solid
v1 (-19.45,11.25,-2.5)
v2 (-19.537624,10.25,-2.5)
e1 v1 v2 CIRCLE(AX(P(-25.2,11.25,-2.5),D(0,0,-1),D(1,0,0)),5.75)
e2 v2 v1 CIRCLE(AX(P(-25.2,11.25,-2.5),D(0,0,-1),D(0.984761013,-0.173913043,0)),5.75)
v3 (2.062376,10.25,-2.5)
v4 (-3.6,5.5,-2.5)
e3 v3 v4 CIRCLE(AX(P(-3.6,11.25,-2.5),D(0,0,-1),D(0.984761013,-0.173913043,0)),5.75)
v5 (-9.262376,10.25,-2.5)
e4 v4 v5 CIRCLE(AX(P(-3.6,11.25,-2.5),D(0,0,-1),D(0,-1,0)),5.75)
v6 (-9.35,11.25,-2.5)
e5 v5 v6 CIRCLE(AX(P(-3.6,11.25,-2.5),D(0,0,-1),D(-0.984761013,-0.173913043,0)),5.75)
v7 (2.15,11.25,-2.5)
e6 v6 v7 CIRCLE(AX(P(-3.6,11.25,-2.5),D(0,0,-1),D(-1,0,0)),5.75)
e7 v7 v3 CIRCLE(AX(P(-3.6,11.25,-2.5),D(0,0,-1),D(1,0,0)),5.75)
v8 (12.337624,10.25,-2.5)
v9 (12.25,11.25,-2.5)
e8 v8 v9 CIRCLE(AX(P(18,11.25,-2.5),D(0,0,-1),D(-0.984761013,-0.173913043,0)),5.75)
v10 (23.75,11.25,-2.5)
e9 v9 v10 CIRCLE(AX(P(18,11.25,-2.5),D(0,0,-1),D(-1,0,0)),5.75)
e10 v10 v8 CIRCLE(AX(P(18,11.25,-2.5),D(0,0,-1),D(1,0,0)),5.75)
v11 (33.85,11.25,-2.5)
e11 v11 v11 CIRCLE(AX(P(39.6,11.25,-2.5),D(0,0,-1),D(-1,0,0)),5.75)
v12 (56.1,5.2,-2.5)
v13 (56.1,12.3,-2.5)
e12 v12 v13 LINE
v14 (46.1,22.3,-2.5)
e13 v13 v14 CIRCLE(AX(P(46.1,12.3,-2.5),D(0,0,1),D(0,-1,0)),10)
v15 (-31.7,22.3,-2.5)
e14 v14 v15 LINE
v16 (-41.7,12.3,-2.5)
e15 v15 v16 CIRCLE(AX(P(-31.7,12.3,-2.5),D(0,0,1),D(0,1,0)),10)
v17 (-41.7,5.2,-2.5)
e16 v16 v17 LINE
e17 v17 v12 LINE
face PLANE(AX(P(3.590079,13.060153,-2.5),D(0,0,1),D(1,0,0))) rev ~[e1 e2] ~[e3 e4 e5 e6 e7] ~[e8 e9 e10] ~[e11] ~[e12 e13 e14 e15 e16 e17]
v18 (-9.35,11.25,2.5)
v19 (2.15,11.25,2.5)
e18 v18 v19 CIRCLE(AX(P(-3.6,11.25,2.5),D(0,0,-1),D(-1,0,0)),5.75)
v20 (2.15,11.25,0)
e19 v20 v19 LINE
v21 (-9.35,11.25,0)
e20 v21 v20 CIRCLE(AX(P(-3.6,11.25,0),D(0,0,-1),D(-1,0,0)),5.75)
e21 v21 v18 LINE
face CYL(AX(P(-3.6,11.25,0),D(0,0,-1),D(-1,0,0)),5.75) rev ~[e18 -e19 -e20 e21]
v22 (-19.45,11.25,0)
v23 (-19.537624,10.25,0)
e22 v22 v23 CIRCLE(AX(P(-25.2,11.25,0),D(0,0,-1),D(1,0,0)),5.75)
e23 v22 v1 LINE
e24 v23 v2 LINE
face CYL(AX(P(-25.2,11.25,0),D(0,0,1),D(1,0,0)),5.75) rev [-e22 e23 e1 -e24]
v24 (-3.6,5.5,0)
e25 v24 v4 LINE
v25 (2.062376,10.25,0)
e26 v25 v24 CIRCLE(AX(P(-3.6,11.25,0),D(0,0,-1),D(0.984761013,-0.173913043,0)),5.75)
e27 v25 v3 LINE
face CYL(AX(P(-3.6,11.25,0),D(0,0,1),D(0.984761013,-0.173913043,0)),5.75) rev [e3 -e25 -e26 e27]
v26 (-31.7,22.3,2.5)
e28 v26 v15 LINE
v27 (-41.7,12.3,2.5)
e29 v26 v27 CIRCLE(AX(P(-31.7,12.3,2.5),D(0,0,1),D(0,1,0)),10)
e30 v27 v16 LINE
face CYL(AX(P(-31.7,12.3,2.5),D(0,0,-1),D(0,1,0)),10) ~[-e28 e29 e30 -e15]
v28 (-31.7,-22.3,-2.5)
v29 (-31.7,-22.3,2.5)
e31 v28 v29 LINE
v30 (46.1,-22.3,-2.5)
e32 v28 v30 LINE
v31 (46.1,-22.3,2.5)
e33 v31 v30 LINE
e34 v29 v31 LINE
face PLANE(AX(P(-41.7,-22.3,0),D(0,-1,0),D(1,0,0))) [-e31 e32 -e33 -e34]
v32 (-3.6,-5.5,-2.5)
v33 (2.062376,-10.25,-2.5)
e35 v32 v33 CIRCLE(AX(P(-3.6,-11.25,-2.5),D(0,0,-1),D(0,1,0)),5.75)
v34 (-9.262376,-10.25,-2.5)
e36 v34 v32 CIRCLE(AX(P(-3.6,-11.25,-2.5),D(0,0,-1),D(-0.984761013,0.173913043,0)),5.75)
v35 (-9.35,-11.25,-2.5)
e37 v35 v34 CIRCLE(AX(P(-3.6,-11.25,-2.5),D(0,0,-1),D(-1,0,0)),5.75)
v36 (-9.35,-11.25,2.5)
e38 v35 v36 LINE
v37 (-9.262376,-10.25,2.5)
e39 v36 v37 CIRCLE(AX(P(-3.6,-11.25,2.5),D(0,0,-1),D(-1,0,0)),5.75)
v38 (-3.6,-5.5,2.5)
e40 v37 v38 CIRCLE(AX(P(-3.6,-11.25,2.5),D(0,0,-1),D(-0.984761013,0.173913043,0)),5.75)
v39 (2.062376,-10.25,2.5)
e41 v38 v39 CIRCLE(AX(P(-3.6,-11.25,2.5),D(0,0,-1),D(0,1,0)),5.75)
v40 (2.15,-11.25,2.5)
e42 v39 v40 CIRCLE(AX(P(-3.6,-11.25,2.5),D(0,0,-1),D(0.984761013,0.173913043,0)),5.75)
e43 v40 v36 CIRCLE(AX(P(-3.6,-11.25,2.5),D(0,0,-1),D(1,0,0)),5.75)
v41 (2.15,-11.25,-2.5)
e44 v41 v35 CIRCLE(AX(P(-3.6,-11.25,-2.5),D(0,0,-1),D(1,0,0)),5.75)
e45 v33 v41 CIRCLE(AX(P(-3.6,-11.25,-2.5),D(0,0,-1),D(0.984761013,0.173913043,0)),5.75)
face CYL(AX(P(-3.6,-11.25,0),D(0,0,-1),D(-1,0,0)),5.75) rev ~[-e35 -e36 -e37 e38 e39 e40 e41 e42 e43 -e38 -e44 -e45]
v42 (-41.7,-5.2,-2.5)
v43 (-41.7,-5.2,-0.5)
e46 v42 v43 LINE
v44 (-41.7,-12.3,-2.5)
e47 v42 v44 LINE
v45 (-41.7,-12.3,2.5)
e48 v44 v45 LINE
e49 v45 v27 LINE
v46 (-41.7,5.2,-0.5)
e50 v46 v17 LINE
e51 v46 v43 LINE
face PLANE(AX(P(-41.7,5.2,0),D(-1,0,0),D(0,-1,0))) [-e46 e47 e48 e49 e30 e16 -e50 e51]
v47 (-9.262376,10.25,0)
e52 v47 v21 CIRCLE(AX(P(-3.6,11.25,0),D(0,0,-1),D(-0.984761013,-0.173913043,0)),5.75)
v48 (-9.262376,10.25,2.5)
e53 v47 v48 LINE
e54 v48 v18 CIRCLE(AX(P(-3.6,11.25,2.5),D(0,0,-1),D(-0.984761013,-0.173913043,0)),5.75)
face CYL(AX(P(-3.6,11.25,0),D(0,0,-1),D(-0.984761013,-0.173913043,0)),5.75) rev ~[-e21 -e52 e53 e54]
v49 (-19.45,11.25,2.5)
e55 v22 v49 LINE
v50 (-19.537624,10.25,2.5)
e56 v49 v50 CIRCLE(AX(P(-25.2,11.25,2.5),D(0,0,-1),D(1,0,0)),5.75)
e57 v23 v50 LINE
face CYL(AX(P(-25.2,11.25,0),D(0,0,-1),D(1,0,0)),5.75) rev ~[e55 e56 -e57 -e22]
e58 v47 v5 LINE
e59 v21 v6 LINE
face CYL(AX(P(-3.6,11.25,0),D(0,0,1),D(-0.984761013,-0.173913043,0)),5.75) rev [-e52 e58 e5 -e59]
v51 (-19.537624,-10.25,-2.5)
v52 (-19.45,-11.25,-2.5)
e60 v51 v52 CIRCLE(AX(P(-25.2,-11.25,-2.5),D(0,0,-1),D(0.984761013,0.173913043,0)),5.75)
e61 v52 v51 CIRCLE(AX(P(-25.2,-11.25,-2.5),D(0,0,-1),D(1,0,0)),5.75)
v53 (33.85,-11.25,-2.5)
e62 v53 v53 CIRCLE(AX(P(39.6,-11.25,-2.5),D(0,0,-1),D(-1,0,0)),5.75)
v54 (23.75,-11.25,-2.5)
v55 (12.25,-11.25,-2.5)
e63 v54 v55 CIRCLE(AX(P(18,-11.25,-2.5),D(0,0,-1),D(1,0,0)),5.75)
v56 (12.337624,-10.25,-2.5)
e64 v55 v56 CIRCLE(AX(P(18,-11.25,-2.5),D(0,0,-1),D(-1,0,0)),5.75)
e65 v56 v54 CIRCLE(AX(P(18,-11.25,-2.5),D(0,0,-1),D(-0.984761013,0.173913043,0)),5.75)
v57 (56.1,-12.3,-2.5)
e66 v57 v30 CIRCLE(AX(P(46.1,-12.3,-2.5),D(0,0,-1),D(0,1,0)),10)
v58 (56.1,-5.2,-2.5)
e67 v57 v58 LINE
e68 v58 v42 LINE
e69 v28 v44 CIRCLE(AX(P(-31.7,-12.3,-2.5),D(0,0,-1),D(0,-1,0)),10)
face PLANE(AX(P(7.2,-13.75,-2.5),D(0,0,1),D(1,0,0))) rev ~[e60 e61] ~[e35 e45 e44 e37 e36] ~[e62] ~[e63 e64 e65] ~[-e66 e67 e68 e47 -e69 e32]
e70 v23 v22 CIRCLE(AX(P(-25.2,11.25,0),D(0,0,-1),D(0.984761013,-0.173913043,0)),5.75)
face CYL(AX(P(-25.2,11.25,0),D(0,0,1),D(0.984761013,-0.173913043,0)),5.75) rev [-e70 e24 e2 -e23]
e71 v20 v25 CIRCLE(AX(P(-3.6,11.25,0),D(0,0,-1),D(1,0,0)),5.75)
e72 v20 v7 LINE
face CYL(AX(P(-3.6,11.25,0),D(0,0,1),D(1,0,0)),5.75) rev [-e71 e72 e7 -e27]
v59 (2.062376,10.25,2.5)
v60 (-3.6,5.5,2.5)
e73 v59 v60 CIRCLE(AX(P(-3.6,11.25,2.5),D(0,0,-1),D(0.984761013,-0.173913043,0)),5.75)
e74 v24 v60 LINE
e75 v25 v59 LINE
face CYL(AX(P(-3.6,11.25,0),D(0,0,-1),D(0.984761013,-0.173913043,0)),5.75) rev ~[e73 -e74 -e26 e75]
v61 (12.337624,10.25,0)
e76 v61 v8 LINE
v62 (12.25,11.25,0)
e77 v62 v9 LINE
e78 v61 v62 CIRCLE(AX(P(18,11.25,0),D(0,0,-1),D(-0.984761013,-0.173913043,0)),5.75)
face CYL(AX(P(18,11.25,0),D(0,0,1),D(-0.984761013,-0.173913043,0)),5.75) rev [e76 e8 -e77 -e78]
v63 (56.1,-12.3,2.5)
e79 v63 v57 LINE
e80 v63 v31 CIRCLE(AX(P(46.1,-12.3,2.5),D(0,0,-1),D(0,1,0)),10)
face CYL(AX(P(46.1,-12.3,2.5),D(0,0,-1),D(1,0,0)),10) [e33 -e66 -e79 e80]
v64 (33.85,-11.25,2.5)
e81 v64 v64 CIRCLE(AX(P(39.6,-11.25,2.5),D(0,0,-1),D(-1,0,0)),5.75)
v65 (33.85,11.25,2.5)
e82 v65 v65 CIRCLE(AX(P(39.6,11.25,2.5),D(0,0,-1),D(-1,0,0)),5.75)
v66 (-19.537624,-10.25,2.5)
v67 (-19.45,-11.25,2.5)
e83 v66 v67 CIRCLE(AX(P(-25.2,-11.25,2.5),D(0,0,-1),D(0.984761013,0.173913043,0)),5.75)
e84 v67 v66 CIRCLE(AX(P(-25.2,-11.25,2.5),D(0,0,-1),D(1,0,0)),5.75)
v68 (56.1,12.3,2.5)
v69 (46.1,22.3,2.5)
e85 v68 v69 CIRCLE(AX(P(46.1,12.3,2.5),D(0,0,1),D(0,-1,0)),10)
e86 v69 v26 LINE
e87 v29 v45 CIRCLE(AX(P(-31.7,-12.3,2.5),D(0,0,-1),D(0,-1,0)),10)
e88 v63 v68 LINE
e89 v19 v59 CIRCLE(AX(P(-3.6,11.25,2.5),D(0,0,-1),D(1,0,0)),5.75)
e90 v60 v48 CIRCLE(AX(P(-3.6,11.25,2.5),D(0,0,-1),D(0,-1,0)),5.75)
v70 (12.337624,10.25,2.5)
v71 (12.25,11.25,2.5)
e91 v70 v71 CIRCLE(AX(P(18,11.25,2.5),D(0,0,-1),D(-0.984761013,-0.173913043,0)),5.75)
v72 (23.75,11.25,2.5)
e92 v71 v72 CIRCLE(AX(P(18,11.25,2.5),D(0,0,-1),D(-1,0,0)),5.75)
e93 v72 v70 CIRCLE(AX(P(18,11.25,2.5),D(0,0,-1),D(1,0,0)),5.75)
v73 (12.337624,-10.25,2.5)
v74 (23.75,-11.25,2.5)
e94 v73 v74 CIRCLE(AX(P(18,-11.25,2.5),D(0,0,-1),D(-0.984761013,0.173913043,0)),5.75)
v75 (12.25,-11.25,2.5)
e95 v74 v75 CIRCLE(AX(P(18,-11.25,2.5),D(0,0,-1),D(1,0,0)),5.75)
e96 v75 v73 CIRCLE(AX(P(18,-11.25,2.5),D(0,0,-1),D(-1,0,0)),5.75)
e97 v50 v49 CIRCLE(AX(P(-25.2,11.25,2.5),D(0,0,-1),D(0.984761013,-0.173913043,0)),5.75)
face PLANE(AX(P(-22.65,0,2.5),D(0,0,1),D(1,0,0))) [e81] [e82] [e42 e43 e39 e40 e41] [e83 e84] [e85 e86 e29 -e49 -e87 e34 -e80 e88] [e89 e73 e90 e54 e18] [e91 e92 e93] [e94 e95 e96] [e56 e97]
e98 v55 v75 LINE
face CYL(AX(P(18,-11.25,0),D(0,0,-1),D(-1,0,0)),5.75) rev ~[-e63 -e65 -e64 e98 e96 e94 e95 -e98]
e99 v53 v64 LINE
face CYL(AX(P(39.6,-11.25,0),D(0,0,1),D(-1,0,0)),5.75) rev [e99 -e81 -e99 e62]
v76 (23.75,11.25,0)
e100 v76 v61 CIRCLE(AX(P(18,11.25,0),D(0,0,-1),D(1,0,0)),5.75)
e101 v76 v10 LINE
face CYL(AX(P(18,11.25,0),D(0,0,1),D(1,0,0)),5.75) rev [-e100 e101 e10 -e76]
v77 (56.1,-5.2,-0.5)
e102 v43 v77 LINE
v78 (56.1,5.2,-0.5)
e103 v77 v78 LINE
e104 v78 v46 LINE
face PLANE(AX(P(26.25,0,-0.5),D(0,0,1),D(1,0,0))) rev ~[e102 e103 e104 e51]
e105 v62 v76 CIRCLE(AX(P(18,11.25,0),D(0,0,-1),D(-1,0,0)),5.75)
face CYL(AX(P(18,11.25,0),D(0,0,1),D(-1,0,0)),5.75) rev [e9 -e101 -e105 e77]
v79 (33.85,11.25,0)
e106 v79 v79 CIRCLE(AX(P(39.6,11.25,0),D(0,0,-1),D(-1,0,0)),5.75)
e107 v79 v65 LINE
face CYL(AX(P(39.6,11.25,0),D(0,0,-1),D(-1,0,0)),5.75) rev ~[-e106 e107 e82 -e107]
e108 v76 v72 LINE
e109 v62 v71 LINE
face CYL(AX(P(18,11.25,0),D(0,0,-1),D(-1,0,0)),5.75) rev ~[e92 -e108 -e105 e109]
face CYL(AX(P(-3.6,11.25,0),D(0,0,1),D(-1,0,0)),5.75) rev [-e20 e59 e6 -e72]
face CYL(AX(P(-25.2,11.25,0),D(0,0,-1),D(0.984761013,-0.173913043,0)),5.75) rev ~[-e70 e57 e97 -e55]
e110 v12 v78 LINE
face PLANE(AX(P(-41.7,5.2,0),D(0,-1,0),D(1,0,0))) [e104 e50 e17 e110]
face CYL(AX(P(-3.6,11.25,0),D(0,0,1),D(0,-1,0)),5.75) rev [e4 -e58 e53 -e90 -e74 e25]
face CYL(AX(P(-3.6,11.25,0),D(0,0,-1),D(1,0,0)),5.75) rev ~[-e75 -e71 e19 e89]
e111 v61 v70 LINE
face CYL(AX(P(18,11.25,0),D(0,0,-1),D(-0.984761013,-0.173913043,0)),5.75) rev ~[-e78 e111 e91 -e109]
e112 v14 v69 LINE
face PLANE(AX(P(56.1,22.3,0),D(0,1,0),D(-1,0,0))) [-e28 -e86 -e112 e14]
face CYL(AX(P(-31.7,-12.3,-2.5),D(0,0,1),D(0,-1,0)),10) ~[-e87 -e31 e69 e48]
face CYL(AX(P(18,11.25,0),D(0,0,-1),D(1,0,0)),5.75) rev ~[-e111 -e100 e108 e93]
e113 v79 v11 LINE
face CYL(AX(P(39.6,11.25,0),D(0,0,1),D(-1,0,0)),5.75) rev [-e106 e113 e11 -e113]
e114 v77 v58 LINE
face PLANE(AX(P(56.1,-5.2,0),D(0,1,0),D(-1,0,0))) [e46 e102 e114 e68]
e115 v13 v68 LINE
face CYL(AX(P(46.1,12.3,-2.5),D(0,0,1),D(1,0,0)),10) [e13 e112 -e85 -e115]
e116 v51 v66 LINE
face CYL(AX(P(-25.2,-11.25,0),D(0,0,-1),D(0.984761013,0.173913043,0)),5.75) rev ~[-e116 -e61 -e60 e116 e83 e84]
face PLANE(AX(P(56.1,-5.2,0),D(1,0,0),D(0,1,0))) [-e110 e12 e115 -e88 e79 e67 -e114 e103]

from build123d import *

# Parameters (mm, degrees)
F1_DEPTH = 2.5
F2_DEPTH = 2.5
F3_DEPTH = 0.5
F4_R     = 10


# Not quite as in the source:
# - a feature names something its author has since deleted; it is built from what else it names


with BuildPart() as f1:
    # F0 (on Top) → F1 (new body, symmetric)
    with BuildSketch(Plane.XY):
        with BuildLine():
            Line((-41.7, 5.2), (-3.6, 5.2))
            Line((-3.6, 5.2), (-3.6, 5.5))
            ThreePointArc((-3.6, 5.5), (-7.2954363748, 6.8447474533), (-9.2623758265, 10.25))
            Line((-9.2623758265, 10.25), (-19.5376241735, 10.25))
            ThreePointArc((-19.5376241735, 10.25), (-30.9280520686, 11.7519158285), (-19.45, 11.25))
            Line((-19.45, 11.25), (-9.35, 11.25))
            ThreePointArc((-9.35, 11.25), (-3.6, 17), (2.15, 11.25))
            Line((2.15, 11.25), (7.2, 11.25))
            Line((7.2, 11.25), (12.25, 11.25))
            ThreePointArc((12.25, 11.25), (18, 17), (23.75, 11.25))
            ThreePointArc((23.75, 11.25), (18.5019158285, 5.5219479314), (12.3376241735, 10.25))
            Line((12.3376241735, 10.25), (7.2, 10.25))
            Line((7.2, 10.25), (7.2, 5.2))
            Line((7.2, 5.2), (56.1, 5.2))
            Line((56.1, 5.2), (56.1, 22.3))
            Line((56.1, 22.3), (-41.7, 22.3))
            Line((-41.7, 22.3), (-41.7, 5.2))
        make_face()
        with BuildLine():
            ThreePointArc((45.35, 11.25), (39.6, 5.5), (33.85, 11.25))
            ThreePointArc((33.85, 11.25), (39.6, 17), (45.35, 11.25))
        make_face(mode=Mode.SUBTRACT)
        with BuildLine():
            Line((-3.6, 5.5), (-3.6, 5.2))
            Line((-3.6, 5.2), (7.2, 5.2))
            Line((7.2, 5.2), (7.2, 10.25))
            Line((7.2, 10.25), (2.0623758265, 10.25))
            ThreePointArc((2.0623758265, 10.25), (0.0954363748, 6.8447474533), (-3.6, 5.5))
        make_face()
        with BuildLine():
            Line((-19.5376241735, 10.25), (-9.2623758265, 10.25))
            ThreePointArc((-9.2623758265, 10.25), (-9.3280520686, 10.7480841715), (-9.35, 11.25))
            Line((-9.35, 11.25), (-19.45, 11.25))
            ThreePointArc((-19.45, 11.25), (-19.4719479314, 10.7480841715), (-19.5376241735, 10.25))
        make_face()
        with BuildLine():
            ThreePointArc((2.15, 11.25), (2.1280520686, 10.7480841715), (2.0623758265, 10.25))
            Line((2.0623758265, 10.25), (7.2, 10.25))
            Line((7.2, 10.25), (7.2, 11.25))
            Line((7.2, 11.25), (2.15, 11.25))
        make_face()
        with BuildLine():
            Line((7.2, 11.25), (7.2, 10.25))
            Line((7.2, 10.25), (12.3376241735, 10.25))
            ThreePointArc((12.3376241735, 10.25), (12.2719479314, 10.7480841715), (12.25, 11.25))
            Line((12.25, 11.25), (7.2, 11.25))
        make_face()
    extrude(amount=F1_DEPTH, both=True)



with BuildPart() as f1b:
    # F0 (on Top) → F1, piece 2 (new body, symmetric)
    with BuildSketch(Plane.XY):
        Polygon((56.1, -5.2), (-3.6, -5.2), (-41.7, -5.2), (-41.7, -22.3), (56.1, -22.3), align=None)
        with BuildLine():
            ThreePointArc((-9.2623758265, -10.25), (-7.2954363748, -6.8447474533), (-3.6, -5.5))
            ThreePointArc((-3.6, -5.5), (0.0954363748, -6.8447474533), (2.0623758265, -10.25))
            Line((2.0623758265, -10.25), (12.3376241735, -10.25))
            ThreePointArc((12.3376241735, -10.25), (18.5019158285, -5.5219479314), (23.75, -11.25))
            ThreePointArc((23.75, -11.25), (18, -17), (12.25, -11.25))
            Line((12.25, -11.25), (2.15, -11.25))
            ThreePointArc((2.15, -11.25), (-3.6, -17), (-9.35, -11.25))
            Line((-9.35, -11.25), (-19.45, -11.25))
            ThreePointArc((-19.45, -11.25), (-30.9280520686, -11.7519158285), (-19.5376241735, -10.25))
            Line((-19.5376241735, -10.25), (-9.2623758265, -10.25))
        make_face(mode=Mode.SUBTRACT)
        with BuildLine():
            ThreePointArc((45.35, -11.25), (39.6, -17), (33.85, -11.25))
            ThreePointArc((33.85, -11.25), (39.6, -5.5), (45.35, -11.25))
        make_face(mode=Mode.SUBTRACT)
        with BuildLine():
            Line((12.3376241735, -10.25), (2.0623758265, -10.25))
            ThreePointArc((2.0623758265, -10.25), (2.1280520686, -10.7480841715), (2.15, -11.25))
            Line((2.15, -11.25), (12.25, -11.25))
            ThreePointArc((12.25, -11.25), (12.2719479314, -10.7480841715), (12.3376241735, -10.25))
        make_face()
        with BuildLine():
            ThreePointArc((-9.35, -11.25), (-9.3280520686, -10.7480841715), (-9.2623758265, -10.25))
            Line((-9.2623758265, -10.25), (-19.5376241735, -10.25))
            ThreePointArc((-19.5376241735, -10.25), (-19.4719479314, -10.7480841715), (-19.45, -11.25))
            Line((-19.45, -11.25), (-9.35, -11.25))
        make_face()
    extrude(amount=F1_DEPTH, both=True)


with BuildPart() as f1_1:
    add(f1.part)

    add(f1b.part)  # F2 merges F1b
    # F0 (on Top) → F2 (join)
    with BuildSketch(Plane.XY):
        Polygon((-3.6, -5.2), (-3.6, 0), (-3.6, 5.2), (-41.7, 5.2), (-41.7, -5.2), align=None)
        Polygon((-3.6, 5.2), (-3.6, 0), (-3.6, -5.2), (56.1, -5.2), (56.1, 0), (56.1, 5.2), (7.2, 5.2), align=None)
    extrude(amount=F2_DEPTH)

    # F0 (on Top) → F3 (join)
    with BuildSketch(Plane.XY):
        Polygon((-3.6, 5.2), (-3.6, 0), (-3.6, -5.2), (56.1, -5.2), (56.1, 0), (56.1, 5.2), (7.2, 5.2), align=None)
        Polygon((-3.6, -5.2), (-3.6, 0), (-3.6, 5.2), (-41.7, 5.2), (-41.7, -5.2), align=None)
    extrude(amount=-F3_DEPTH)

    # F4
    f4_edges = [f1_1.edges().sort_by_distance(p)[0] for p in [
        (56.1, -22.3, 0),
        (-41.7, -22.3, 0),
        (-41.7, 22.3, 0),
        (56.1, 22.3, 0),
    ]]
    fillet(f4_edges, radius=F4_R)


solid = f1_1.part
